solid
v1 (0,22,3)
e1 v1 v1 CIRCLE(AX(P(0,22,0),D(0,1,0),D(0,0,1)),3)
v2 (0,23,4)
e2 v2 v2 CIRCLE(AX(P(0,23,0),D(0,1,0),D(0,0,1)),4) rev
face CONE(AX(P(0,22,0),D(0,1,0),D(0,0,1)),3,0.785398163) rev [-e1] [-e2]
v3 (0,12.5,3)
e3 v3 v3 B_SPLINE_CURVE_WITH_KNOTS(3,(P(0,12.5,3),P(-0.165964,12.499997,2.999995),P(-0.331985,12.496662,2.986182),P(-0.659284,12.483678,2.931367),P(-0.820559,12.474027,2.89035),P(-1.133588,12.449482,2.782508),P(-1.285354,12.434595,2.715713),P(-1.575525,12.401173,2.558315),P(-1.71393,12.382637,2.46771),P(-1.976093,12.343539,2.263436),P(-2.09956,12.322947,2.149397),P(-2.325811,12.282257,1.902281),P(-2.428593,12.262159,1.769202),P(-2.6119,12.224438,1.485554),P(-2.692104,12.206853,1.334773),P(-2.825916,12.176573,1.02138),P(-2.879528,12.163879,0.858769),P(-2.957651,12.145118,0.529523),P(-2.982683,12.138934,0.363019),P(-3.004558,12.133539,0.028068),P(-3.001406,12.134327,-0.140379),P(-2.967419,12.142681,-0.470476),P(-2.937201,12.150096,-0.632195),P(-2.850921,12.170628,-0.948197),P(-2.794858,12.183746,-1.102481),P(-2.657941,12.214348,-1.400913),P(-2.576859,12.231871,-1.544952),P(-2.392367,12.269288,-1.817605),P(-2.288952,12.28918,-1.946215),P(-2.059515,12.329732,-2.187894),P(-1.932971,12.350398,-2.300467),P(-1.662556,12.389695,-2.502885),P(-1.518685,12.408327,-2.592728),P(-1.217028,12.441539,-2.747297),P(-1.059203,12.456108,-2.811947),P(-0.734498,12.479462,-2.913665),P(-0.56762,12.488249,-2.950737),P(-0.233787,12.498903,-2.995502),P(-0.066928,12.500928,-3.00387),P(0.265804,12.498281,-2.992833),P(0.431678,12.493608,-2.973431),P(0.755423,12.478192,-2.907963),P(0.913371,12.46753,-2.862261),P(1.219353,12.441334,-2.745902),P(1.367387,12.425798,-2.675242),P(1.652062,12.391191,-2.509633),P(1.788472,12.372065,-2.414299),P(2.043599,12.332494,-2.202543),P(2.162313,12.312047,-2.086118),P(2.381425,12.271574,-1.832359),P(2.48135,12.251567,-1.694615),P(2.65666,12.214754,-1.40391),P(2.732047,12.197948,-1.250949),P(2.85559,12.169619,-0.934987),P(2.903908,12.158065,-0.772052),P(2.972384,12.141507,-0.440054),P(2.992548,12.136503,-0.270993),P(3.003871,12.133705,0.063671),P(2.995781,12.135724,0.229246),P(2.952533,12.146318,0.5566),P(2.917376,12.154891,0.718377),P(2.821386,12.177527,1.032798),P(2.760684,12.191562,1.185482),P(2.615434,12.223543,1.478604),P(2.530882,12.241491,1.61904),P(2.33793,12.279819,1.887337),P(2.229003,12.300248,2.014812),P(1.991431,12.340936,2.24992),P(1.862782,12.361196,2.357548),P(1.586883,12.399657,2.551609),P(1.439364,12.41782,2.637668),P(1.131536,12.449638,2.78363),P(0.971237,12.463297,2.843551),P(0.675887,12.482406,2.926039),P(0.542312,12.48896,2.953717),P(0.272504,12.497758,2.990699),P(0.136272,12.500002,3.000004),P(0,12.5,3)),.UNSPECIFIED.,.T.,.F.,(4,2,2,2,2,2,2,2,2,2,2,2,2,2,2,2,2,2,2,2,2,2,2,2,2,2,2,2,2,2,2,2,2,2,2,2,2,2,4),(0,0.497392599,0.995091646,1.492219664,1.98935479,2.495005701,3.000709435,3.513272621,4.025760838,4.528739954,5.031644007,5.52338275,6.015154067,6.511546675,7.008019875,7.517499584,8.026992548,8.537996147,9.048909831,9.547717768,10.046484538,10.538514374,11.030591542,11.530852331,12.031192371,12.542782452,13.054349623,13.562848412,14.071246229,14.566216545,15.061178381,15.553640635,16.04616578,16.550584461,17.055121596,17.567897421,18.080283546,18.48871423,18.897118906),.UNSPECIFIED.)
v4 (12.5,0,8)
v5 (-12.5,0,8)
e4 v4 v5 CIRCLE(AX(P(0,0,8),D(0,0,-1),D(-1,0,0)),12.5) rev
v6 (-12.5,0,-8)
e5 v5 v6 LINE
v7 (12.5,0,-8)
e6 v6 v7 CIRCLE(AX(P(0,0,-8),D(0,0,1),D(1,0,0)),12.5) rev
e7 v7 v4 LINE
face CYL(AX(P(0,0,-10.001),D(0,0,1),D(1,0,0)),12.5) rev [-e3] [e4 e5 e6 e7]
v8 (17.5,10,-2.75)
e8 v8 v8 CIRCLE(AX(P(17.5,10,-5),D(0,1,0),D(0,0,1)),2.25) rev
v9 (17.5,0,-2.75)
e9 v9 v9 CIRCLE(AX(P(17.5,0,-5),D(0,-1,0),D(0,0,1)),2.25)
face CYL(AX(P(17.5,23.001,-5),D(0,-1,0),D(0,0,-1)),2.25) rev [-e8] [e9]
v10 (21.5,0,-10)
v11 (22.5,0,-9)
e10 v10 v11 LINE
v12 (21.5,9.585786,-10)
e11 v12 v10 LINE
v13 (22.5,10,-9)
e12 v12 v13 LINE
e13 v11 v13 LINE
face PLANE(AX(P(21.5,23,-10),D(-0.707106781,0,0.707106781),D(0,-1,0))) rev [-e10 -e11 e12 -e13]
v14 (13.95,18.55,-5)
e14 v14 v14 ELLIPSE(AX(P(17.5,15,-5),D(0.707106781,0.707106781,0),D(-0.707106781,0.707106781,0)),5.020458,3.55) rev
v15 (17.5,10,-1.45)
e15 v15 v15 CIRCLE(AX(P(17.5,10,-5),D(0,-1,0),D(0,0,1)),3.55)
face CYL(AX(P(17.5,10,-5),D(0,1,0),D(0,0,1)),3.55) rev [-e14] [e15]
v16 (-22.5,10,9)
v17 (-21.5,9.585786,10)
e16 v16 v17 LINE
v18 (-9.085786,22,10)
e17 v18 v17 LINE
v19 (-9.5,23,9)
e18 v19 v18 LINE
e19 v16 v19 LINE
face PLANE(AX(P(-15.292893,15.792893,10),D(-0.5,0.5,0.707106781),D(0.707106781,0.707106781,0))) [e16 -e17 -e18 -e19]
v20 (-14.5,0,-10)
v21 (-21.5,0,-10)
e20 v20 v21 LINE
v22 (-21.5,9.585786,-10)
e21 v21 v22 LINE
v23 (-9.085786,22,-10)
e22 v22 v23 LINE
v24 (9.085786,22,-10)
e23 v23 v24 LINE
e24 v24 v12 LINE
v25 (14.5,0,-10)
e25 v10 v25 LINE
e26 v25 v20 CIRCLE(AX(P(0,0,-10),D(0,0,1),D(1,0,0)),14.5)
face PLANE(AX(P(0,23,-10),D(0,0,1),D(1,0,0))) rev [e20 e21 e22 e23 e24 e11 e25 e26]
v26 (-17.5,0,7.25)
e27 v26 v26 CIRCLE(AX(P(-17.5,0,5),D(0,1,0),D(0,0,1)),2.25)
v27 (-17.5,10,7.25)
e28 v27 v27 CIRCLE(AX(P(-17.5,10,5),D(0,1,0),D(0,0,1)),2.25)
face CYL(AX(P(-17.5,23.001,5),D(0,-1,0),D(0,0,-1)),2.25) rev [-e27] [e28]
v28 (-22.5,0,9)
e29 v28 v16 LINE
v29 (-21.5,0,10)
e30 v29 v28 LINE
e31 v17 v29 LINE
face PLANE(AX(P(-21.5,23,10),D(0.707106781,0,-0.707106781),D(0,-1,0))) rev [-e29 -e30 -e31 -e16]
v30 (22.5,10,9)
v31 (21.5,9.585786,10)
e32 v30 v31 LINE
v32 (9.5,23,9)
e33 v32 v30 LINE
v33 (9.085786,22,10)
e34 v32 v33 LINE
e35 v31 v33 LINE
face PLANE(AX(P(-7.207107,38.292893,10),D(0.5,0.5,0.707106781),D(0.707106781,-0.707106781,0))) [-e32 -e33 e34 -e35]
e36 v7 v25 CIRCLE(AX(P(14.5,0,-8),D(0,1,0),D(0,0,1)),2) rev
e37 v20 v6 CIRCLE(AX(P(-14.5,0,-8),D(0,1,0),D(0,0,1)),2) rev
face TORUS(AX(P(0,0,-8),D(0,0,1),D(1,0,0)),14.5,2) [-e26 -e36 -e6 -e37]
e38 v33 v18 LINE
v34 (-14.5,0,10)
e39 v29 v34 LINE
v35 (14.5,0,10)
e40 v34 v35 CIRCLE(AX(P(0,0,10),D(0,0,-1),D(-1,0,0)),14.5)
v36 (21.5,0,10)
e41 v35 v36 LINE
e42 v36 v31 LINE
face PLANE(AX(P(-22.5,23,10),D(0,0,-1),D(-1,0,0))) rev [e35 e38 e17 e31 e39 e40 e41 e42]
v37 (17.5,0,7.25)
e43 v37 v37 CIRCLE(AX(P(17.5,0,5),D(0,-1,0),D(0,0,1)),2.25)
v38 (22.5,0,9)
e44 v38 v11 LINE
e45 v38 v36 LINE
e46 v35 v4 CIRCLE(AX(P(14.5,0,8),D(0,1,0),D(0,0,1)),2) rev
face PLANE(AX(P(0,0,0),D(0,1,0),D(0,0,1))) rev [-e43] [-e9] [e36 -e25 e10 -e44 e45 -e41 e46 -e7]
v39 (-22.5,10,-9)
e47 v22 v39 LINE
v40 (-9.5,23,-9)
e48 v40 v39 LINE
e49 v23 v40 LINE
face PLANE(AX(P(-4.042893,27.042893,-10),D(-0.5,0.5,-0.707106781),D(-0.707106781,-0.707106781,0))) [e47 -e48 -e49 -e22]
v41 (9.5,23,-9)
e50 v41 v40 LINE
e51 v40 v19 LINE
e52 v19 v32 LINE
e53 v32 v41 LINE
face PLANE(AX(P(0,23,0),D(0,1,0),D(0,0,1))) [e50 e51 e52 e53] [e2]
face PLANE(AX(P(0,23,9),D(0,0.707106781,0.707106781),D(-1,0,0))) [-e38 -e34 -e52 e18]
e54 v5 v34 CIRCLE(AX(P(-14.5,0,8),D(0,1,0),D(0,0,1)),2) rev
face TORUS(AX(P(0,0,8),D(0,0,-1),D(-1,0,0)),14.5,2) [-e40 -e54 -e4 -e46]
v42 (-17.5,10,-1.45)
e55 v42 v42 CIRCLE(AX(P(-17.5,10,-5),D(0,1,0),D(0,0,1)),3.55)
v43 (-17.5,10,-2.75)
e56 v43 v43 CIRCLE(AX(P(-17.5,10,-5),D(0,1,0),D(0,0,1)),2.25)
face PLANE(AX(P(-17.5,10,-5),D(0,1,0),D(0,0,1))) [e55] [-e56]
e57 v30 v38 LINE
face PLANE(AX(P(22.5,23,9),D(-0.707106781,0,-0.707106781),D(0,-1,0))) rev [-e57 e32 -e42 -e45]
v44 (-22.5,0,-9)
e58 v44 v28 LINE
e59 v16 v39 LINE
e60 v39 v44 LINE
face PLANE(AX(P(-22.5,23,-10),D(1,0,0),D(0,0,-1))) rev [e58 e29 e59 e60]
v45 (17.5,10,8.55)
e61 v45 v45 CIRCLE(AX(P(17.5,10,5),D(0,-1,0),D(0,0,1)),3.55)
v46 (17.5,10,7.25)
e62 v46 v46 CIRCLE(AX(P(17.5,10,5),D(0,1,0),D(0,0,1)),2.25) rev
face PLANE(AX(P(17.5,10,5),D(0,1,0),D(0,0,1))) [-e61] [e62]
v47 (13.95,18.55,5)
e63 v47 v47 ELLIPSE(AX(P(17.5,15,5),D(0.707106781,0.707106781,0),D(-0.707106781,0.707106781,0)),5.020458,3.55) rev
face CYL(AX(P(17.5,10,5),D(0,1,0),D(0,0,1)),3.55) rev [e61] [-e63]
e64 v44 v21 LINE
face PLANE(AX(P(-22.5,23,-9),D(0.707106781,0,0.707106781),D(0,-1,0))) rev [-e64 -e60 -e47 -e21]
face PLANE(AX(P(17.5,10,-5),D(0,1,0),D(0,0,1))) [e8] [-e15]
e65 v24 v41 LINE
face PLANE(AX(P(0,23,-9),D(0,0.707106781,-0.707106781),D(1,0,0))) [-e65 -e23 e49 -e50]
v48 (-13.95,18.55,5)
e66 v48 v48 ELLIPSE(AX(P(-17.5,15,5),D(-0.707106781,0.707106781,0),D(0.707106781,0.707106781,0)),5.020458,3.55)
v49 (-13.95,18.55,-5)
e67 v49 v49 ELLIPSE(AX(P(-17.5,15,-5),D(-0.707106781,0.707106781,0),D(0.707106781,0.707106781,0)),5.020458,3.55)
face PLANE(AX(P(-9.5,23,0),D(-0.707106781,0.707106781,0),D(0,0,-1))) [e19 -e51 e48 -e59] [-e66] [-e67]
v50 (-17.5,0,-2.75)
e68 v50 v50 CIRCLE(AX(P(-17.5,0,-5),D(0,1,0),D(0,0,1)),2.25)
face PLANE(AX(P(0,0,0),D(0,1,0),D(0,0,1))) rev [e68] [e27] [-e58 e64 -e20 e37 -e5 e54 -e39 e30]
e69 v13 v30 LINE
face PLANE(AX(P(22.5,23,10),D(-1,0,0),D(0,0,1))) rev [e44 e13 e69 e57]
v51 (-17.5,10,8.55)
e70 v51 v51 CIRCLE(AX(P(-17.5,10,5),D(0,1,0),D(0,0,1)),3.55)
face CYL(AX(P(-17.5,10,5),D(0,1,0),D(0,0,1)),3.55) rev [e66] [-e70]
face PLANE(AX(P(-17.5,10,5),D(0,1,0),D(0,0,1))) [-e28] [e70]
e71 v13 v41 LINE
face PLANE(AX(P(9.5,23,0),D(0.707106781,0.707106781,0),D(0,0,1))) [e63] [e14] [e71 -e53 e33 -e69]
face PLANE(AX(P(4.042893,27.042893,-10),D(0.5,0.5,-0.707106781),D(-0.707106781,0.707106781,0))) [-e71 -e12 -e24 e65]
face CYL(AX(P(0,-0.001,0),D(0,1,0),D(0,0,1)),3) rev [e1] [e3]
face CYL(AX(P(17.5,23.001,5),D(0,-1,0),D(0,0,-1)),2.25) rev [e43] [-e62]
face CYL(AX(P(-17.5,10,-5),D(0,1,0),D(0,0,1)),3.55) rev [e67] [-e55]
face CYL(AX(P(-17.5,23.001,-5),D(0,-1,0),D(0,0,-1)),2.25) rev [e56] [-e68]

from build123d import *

# Parameters (mm, degrees)
BOSS_EXTRUDE1_DEPTH     = 23
CUT_EXTRUDE1_REACH      = 39.885
CUT_EXTRUDE2_REACH      = 35.693
SKETCH3_R               = 2.25
CUT_EXTRUDE3_START      = 23
SKETCH4_R               = 3.55
CUT_EXTRUDE3_DEPTH      = 13
FILLET1_R               = 2
CHAMFER1_SIZE           = 13
CHAMFER2_SIZE           = 1
CUT_EXTRUDE4_REACH      = 35.693
CUT_EXTRUDE4_END_RADIUS = 12.5
SKETCH5_R               = 3
CHAMFER3_SIZE           = 1


with BuildPart() as part:
    # Sketch1 → Boss-Extrude1 (new body)
    with BuildSketch(Plane(origin=(0, 0, 0), x_dir=(1, 0, 0), z_dir=(0, 1, 0))):
        Polygon((0, 10), (-22.5, 10), (-22.5, -10), (22.5, -10), (22.5, 10), align=None)
    extrude(amount=BOSS_EXTRUDE1_DEPTH)

    # Sketch2 → Cut-Extrude1 (cut, up to next)
    with BuildSketch(Plane.XY.offset(10), mode=Mode.PRIVATE) as cut_extrude1_sk1:
        with BuildLine():
            Line((-12.5, 0), (-22.5, 0))
            Line((-22.5, 0), (-22.5, -2.522641864))
            Line((-22.5, -2.522641864), (22.5, -2.522641864))
            Line((22.5, -2.522641864), (22.5, 0))
            Line((22.5, 0), (12.5, 0))
            ThreePointArc((12.5, 0), (0, 12.5), (-12.5, 0))
        make_face()
    cut_extrude1_tool1 = extrude(cut_extrude1_sk1.sketch, amount=-CUT_EXTRUDE1_REACH, mode=Mode.PRIVATE) & part.part
    add(cut_extrude1_tool1.solids().sort_by_distance((0, 3.22853, 10))[0], mode=Mode.SUBTRACT)

    # Sketch3 → Cut-Extrude2 (cut, up to next)
    with BuildSketch(Plane(origin=(0, 0, 0), x_dir=(1, 0, 0), z_dir=(0, 1, 0)), mode=Mode.PRIVATE) as cut_extrude2_sk1:
        with Locations(Location((-17.5, -5, 0), (0, 0, 270))):
            Circle(SKETCH3_R)
    cut_extrude2_tool1 = extrude(cut_extrude2_sk1.sketch, amount=CUT_EXTRUDE2_REACH, mode=Mode.PRIVATE) & part.part
    # Sketch3 → Cut-Extrude2 (cut, up to next)
    with BuildSketch(Plane(origin=(0, 0, 0), x_dir=(1, 0, 0), z_dir=(0, 1, 0)), mode=Mode.PRIVATE) as cut_extrude2_sk2:
        with Locations(Location((-17.5, 5, 0), (0, 0, 270))):
            Circle(SKETCH3_R)
    cut_extrude2_tool2 = extrude(cut_extrude2_sk2.sketch, amount=CUT_EXTRUDE2_REACH, mode=Mode.PRIVATE) & part.part
    cut_extrude2_1 = cut_extrude2_tool1.solids().sort_by_distance((-17.5, 0, 5))[0]
    add(cut_extrude2_1, mode=Mode.SUBTRACT)
    cut_extrude2_2 = cut_extrude2_tool2.solids().sort_by_distance((-17.5, 0, -5))[0]
    add(cut_extrude2_2, mode=Mode.SUBTRACT)
    cut_extrude2 = cut_extrude2_1 + cut_extrude2_2  # Cut-Extrude2 as one shape, for the pattern or mirror that repeats it

    # Mirror1: Cut-Extrude2 across plane
    add(cut_extrude2.mirror(Plane(origin=(0, 0, 0), x_dir=(0, 0, 1), z_dir=(1, 0, 0))), mode=Mode.SUBTRACT)

    # Sketch4 → Cut-Extrude3 (cut)
    with BuildSketch(Plane(origin=(0, 0, 0), x_dir=(1, 0, 0), z_dir=(0, 1, 0)).offset(CUT_EXTRUDE3_START)):
        with Locations(Location((-17.5, 5, 0), (0, 0, 270))):
            Circle(SKETCH4_R)
        with Locations(Location((-17.5, -5, 0), (0, 0, 270))):
            Circle(SKETCH4_R)
    cut_extrude3 = extrude(amount=-CUT_EXTRUDE3_DEPTH, mode=Mode.SUBTRACT)

    # Mirror2: Cut-Extrude3 across plane
    add(cut_extrude3.mirror(Plane(origin=(0, 0, 0), x_dir=(0, 0, 1), z_dir=(1, 0, 0))), mode=Mode.SUBTRACT)

    # Fillet1
    fillet1_edges = [part.edges().sort_by_distance(p)[0] for p in [
        (0, 12.5, 10),
        (0, 12.5, -10),
    ]]
    fillet(fillet1_edges, radius=FILLET1_R)

    # Chamfer1
    # the kernel refuses this chamfer: 13 mm, written as the material it takes off along each edge
    with BuildSketch(Plane(origin=(-22.5, 23, -43.431878844), x_dir=(0.9996219169112968, 0.027495876610586424, 0), z_dir=(0, 0, 1))) as chamfer1_piece_1:
        Polygon((CHAMFER1_SIZE * 0.999621916911, -CHAMFER1_SIZE * 0.0274958766106), (-CHAMFER1_SIZE * 0.0274958766106, -CHAMFER1_SIZE * 0.999621916911), (0, 0), align=None)
    extrude(amount=86.863757687, mode=Mode.SUBTRACT)
    with BuildSketch(Plane(origin=(22.5, 23, 43.431878844), x_dir=(0.027495876610586424, -0.9996219169112968, 0), z_dir=(0, 0, -1))) as chamfer1_piece_2:
        Polygon((CHAMFER1_SIZE * 0.999621916911, CHAMFER1_SIZE * 0.0274958766106), (-CHAMFER1_SIZE * 0.0274958766106, CHAMFER1_SIZE * 0.999621916911), (0, 0), align=None)
    extrude(amount=86.863757687, mode=Mode.SUBTRACT)

    # Chamfer2
    chamfer2_edges = [part.edges().sort_by_distance(p)[0] for p in [
        (0, 23, -10),
        (0, 23, 10),
        (-22.5, 5, -10),
        (22.5, 5, -10),
        (-16, 16.5, -10),
        (16, 16.5, -10),
        (22.5, 5, 10),
        (-22.5, 5, 10),
        (-16, 16.5, 10),
        (16, 16.5, 10),
    ]]
    chamfer(chamfer2_edges, length=CHAMFER2_SIZE)

    # Cut-Extrude4: up to this cylinder (the profile starts outside it)
    cut_extrude4_end = Plane(origin=(0, 0, 0), z_dir=(0, 0, 1)) * Cylinder(CUT_EXTRUDE4_END_RADIUS, 97.386, mode=Mode.PRIVATE)
    # Sketch5 → Cut-Extrude4 (cut, up to the surface)
    with BuildSketch(Plane(origin=(0, 23, 0), x_dir=(1, 0, 0), z_dir=(0, 1, 0)), mode=Mode.PRIVATE) as cut_extrude4_sk1:
        with Locations(Location((0, 0, 0), (0, 0, 270))):
            Circle(SKETCH5_R)
    cut_extrude4_tool1 = extrude(cut_extrude4_sk1.sketch, amount=-CUT_EXTRUDE4_REACH, mode=Mode.PRIVATE) - cut_extrude4_end
    add(cut_extrude4_tool1.solids().sort_by_distance((0, 23, 0))[0], mode=Mode.SUBTRACT)

    # Chamfer3
    chamfer3_edges = [part.edges().sort_by_distance(p)[0] for p in [
        (0, 23, -3),
    ]]
    chamfer(chamfer3_edges, length=CHAMFER3_SIZE)


solid = part.part
